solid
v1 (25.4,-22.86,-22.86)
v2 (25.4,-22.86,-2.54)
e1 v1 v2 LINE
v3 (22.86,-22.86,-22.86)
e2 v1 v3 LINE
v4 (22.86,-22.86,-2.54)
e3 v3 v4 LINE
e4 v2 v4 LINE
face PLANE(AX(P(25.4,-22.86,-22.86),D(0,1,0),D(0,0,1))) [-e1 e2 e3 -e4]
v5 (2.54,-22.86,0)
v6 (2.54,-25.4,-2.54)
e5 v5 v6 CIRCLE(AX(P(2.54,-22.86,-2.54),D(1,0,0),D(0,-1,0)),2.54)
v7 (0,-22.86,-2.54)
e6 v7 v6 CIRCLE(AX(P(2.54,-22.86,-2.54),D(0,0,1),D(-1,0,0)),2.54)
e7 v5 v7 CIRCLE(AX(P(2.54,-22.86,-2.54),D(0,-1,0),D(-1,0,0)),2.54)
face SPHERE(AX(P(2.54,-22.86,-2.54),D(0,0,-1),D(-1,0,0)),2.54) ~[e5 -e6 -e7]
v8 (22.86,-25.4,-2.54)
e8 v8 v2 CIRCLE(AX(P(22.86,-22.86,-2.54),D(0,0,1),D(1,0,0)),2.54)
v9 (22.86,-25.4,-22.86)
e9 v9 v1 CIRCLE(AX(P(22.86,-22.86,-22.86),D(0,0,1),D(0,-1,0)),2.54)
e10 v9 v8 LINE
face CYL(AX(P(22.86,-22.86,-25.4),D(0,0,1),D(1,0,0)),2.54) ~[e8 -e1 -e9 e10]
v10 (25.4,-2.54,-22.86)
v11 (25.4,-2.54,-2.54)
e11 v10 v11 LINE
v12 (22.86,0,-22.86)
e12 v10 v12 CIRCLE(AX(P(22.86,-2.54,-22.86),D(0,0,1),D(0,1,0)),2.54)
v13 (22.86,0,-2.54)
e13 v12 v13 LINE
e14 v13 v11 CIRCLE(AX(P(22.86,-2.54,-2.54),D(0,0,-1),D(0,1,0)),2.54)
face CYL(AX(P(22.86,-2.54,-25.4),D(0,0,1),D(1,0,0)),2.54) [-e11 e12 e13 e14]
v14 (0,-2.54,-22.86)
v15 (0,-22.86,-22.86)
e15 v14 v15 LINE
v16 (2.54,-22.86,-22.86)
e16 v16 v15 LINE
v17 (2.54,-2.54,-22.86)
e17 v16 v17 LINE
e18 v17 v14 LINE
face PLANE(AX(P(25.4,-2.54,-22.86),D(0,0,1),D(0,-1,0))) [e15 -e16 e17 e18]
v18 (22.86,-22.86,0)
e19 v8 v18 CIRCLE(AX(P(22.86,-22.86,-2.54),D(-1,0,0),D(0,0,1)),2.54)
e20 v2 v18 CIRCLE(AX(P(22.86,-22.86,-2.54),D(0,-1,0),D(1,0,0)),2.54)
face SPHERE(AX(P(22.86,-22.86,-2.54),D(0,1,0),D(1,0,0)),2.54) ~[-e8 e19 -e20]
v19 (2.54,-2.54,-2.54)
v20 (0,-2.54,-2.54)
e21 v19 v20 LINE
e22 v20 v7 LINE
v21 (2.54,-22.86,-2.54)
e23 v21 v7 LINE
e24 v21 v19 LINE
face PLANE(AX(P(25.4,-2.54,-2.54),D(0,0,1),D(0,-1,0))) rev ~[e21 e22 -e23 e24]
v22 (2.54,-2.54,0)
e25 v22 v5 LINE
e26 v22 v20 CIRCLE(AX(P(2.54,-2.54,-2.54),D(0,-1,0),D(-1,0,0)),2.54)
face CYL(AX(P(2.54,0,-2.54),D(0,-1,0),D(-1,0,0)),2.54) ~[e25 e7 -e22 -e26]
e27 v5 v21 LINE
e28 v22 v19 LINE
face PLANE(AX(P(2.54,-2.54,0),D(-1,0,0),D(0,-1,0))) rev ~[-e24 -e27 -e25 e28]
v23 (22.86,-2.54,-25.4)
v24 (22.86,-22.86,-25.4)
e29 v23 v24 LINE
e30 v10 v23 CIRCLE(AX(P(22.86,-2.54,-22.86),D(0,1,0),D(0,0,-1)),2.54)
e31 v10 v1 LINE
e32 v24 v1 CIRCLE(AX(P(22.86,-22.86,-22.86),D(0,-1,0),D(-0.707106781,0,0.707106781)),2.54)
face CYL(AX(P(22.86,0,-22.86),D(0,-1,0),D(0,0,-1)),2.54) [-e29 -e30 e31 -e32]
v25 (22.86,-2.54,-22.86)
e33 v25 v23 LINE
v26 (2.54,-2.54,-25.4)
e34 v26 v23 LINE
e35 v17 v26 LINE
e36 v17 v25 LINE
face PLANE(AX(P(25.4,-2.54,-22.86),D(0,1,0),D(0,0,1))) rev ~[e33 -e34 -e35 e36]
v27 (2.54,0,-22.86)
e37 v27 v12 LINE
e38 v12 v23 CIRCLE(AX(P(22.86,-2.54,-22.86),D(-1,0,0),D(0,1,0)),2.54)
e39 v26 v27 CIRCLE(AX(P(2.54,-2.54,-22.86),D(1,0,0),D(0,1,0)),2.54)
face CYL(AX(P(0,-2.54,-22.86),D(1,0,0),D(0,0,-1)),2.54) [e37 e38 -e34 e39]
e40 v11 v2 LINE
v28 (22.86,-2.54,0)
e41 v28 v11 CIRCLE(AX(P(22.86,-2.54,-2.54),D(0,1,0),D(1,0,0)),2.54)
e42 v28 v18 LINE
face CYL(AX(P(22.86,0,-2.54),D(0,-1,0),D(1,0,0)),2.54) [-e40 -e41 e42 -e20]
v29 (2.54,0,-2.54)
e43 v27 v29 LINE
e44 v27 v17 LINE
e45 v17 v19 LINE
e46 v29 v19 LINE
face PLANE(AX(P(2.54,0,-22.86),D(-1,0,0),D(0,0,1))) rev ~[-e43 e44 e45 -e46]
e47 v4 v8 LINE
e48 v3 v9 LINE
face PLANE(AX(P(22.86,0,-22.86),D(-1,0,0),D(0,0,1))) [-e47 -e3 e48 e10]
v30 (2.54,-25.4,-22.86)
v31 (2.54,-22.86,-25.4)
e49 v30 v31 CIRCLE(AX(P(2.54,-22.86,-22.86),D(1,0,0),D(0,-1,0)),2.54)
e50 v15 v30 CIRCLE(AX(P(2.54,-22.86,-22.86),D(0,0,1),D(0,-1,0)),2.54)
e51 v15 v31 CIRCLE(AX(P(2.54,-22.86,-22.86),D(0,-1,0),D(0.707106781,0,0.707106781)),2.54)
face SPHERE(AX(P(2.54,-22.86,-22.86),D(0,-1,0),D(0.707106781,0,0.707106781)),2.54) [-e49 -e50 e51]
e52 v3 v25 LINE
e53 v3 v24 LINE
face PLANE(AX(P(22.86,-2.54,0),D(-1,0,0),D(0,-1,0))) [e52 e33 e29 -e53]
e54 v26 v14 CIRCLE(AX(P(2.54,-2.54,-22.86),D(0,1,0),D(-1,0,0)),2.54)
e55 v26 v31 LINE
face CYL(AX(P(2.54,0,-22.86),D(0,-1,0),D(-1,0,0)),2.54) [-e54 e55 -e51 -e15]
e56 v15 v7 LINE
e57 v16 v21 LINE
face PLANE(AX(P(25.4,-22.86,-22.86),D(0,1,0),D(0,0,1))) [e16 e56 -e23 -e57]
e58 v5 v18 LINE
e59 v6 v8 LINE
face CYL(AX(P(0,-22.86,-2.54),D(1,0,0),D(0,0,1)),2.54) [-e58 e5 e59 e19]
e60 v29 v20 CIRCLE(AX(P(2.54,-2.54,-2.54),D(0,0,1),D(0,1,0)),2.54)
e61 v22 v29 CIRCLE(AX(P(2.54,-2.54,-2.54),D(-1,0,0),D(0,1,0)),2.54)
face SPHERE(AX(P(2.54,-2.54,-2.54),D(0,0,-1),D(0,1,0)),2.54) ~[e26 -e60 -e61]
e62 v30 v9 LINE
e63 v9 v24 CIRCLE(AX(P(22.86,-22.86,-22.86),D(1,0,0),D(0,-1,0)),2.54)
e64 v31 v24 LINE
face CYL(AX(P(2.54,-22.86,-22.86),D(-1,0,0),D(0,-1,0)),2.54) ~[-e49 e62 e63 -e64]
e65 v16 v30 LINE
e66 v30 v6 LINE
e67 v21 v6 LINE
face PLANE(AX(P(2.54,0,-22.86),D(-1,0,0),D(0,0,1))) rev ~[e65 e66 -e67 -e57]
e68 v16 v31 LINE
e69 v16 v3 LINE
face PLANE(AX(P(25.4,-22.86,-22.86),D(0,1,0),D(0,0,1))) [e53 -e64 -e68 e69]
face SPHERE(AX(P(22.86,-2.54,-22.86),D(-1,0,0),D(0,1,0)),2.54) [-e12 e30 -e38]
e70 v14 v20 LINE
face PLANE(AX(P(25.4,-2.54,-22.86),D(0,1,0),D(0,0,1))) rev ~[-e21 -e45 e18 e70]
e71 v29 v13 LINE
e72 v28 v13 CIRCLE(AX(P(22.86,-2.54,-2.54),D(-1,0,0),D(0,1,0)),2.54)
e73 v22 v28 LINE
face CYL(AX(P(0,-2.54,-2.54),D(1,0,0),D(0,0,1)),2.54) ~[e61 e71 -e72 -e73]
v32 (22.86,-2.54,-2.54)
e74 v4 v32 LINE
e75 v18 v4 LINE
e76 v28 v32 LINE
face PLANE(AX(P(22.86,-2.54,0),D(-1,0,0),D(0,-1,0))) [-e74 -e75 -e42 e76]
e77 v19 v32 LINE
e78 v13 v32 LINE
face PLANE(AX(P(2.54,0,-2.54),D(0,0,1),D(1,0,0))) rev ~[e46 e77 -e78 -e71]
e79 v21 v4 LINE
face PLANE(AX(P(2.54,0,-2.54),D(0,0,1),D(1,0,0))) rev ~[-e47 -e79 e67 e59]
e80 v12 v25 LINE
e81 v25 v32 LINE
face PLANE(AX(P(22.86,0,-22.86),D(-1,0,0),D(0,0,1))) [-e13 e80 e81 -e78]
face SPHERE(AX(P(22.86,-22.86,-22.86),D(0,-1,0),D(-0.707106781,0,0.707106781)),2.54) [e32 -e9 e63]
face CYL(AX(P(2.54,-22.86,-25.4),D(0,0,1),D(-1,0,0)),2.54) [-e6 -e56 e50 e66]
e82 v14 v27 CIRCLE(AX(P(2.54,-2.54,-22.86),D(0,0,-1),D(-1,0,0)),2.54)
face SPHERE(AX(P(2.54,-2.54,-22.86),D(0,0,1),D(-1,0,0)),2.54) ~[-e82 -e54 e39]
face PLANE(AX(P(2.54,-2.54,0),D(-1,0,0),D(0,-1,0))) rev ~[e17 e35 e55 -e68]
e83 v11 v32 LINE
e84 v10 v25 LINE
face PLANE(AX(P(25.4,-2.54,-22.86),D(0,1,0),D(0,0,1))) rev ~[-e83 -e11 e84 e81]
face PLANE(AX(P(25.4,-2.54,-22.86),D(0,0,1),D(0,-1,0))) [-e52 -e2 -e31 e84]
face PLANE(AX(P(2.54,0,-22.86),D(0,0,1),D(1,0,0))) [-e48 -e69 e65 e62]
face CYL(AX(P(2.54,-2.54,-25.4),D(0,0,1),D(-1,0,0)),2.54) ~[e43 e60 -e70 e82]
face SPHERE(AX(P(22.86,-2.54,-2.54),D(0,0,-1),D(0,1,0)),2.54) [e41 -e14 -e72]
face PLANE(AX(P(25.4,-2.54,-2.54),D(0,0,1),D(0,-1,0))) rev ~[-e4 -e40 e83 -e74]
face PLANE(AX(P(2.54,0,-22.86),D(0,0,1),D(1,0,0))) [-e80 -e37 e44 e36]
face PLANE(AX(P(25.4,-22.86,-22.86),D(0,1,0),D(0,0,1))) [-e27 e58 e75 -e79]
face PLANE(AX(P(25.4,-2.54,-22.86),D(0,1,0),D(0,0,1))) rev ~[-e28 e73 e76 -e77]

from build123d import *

# Parameters (mm, degrees)
F0_W         = 25.4
F0_H         = 25.4
F1_DEPTH     = 25.4
F2_R         = 2.54
F3_T1_DEPTH  = 20.32
F3_S5_W      = 2.54
F3_S5_H      = 2.54
F3_T6_DEPTH  = 2.54
F3_S11_W     = 2.54
F3_S11_H     = 2.54
F3_T12_DEPTH = 2.54
F4_DEPTH     = 25.401
F5_DEPTH     = 25.401
F6_DEPTH     = 25.401


# Not quite as in the source:
# - a fillet or chamfer that OpenCascade refuses, or shapes differently, is made with other operations: its cross-section is extruded or revolved along the edge and cut away or added


with BuildPart() as f1:
    # F0 (on Front) → F1 (new body)
    with BuildSketch(Plane.XZ):
        with Locations((12.7, -12.7)):
            Rectangle(F0_W, F0_H)
    extrude(amount=F1_DEPTH)

    # F2
    f2_edges = [f1.edges().sort_by_distance(p)[0] for p in [
        (0, 0, -12.7),
        (0, -25.4, -12.7),
        (0, -12.7, -25.4),
        (12.7, 0, -25.4),
        (25.4, 0, -12.7),
        (12.7, 0, 0),
        (0, -12.7, 0),
        (25.4, -12.7, 0),
        (25.4, -12.7, -25.4),
        (25.4, -25.4, -12.7),
        (12.7, -25.4, 0),
    ]]
    fillet(f2_edges, radius=F2_R)

    # F3: fillet of radius 2.54 on 1 edges, made by hand

    # F3_s2 → F3_t1 (cut)
    with BuildSketch(Plane.YZ.offset(2.54)):
        with BuildLine():
            ThreePointArc((-25.4, -22.86), (-24.6560512242, -24.6560512242), (-22.86, -25.4))
            Line((-22.86, -25.4), (-25.4, -25.4))
            Line((-25.4, -25.4), (-25.4, -22.86))
        make_face()
    extrude(amount=F3_T1_DEPTH, mode=Mode.SUBTRACT)


with BuildPart() as f3_tool4:
    # F3_s5 → F3_t6 (new body)
    with BuildSketch(Plane.XZ.offset(22.86)):
        with Locations((1.27, -24.13)):
            Rectangle(F3_S5_W, F3_S5_H)
    extrude(amount=F3_T6_DEPTH)

    # F3_s7 → F3_t8 (revolve, cut)
    with BuildSketch(Plane(origin=(2.54, -22.86, -22.86), x_dir=(0.7071067812, 0, 0.7071067812), z_dir=(0.7071067812, 0, -0.7071067812))):
        with BuildLine():
            ThreePointArc((0, -2.54), (2.54, 0), (0, 2.54))
            Line((0, 2.54), (0, -2.54))
        make_face()
    revolve(axis=Axis((2.54, -22.86, -22.86), (0, -1, 0)), mode=Mode.SUBTRACT)


with BuildPart() as f1_1:
    add(f1.part)

    # F3_t3: cut F3_tool4
    add(f3_tool4.part, mode=Mode.SUBTRACT)


with BuildPart() as f3_tool10:
    # F3_s11 → F3_t12 (new body)
    with BuildSketch(Plane.XZ.offset(22.86)):
        with Locations((24.13, -24.13)):
            Rectangle(F3_S11_W, F3_S11_H)
    extrude(amount=F3_T12_DEPTH)

    # F3_s13 → F3_t14 (revolve, cut)
    with BuildSketch(Plane(origin=(22.86, -22.86, -22.86), x_dir=(-0.7071067812, 0, 0.7071067812), z_dir=(0.7071067812, 0, 0.7071067812))):
        with BuildLine():
            ThreePointArc((0, -2.54), (2.54, 0), (0, 2.54))
            Line((0, 2.54), (0, -2.54))
        make_face()
    revolve(axis=Axis((22.86, -22.86, -22.86), (0, -1, 0)), mode=Mode.SUBTRACT)


with BuildPart() as f1_2:
    add(f1_1.part)

    # F3_t9: cut F3_tool10
    add(f3_tool10.part, mode=Mode.SUBTRACT)

    # F4 (cut, through all): a face of the model
    f4_faces = [f1_2.faces().sort_by_distance(p)[0] for p in [
        (12.7, -12.7, 0),
    ]]
    extrude(f4_faces, amount=-F4_DEPTH, mode=Mode.SUBTRACT)

    # F5 (cut, through all): a face of the model
    f5_faces = [f1_2.faces().sort_by_distance(p)[0] for p in [
        (25.4, -12.7, -12.7),
    ]]
    extrude(f5_faces, amount=-F5_DEPTH, mode=Mode.SUBTRACT)

    # F6 (cut, through all): a face of the model
    f6_faces = [f1_2.faces().sort_by_distance(p)[0] for p in [
        (12.7, 0, -12.7),
    ]]
    extrude(f6_faces, amount=-F6_DEPTH, mode=Mode.SUBTRACT)


solid = f1_2.part
